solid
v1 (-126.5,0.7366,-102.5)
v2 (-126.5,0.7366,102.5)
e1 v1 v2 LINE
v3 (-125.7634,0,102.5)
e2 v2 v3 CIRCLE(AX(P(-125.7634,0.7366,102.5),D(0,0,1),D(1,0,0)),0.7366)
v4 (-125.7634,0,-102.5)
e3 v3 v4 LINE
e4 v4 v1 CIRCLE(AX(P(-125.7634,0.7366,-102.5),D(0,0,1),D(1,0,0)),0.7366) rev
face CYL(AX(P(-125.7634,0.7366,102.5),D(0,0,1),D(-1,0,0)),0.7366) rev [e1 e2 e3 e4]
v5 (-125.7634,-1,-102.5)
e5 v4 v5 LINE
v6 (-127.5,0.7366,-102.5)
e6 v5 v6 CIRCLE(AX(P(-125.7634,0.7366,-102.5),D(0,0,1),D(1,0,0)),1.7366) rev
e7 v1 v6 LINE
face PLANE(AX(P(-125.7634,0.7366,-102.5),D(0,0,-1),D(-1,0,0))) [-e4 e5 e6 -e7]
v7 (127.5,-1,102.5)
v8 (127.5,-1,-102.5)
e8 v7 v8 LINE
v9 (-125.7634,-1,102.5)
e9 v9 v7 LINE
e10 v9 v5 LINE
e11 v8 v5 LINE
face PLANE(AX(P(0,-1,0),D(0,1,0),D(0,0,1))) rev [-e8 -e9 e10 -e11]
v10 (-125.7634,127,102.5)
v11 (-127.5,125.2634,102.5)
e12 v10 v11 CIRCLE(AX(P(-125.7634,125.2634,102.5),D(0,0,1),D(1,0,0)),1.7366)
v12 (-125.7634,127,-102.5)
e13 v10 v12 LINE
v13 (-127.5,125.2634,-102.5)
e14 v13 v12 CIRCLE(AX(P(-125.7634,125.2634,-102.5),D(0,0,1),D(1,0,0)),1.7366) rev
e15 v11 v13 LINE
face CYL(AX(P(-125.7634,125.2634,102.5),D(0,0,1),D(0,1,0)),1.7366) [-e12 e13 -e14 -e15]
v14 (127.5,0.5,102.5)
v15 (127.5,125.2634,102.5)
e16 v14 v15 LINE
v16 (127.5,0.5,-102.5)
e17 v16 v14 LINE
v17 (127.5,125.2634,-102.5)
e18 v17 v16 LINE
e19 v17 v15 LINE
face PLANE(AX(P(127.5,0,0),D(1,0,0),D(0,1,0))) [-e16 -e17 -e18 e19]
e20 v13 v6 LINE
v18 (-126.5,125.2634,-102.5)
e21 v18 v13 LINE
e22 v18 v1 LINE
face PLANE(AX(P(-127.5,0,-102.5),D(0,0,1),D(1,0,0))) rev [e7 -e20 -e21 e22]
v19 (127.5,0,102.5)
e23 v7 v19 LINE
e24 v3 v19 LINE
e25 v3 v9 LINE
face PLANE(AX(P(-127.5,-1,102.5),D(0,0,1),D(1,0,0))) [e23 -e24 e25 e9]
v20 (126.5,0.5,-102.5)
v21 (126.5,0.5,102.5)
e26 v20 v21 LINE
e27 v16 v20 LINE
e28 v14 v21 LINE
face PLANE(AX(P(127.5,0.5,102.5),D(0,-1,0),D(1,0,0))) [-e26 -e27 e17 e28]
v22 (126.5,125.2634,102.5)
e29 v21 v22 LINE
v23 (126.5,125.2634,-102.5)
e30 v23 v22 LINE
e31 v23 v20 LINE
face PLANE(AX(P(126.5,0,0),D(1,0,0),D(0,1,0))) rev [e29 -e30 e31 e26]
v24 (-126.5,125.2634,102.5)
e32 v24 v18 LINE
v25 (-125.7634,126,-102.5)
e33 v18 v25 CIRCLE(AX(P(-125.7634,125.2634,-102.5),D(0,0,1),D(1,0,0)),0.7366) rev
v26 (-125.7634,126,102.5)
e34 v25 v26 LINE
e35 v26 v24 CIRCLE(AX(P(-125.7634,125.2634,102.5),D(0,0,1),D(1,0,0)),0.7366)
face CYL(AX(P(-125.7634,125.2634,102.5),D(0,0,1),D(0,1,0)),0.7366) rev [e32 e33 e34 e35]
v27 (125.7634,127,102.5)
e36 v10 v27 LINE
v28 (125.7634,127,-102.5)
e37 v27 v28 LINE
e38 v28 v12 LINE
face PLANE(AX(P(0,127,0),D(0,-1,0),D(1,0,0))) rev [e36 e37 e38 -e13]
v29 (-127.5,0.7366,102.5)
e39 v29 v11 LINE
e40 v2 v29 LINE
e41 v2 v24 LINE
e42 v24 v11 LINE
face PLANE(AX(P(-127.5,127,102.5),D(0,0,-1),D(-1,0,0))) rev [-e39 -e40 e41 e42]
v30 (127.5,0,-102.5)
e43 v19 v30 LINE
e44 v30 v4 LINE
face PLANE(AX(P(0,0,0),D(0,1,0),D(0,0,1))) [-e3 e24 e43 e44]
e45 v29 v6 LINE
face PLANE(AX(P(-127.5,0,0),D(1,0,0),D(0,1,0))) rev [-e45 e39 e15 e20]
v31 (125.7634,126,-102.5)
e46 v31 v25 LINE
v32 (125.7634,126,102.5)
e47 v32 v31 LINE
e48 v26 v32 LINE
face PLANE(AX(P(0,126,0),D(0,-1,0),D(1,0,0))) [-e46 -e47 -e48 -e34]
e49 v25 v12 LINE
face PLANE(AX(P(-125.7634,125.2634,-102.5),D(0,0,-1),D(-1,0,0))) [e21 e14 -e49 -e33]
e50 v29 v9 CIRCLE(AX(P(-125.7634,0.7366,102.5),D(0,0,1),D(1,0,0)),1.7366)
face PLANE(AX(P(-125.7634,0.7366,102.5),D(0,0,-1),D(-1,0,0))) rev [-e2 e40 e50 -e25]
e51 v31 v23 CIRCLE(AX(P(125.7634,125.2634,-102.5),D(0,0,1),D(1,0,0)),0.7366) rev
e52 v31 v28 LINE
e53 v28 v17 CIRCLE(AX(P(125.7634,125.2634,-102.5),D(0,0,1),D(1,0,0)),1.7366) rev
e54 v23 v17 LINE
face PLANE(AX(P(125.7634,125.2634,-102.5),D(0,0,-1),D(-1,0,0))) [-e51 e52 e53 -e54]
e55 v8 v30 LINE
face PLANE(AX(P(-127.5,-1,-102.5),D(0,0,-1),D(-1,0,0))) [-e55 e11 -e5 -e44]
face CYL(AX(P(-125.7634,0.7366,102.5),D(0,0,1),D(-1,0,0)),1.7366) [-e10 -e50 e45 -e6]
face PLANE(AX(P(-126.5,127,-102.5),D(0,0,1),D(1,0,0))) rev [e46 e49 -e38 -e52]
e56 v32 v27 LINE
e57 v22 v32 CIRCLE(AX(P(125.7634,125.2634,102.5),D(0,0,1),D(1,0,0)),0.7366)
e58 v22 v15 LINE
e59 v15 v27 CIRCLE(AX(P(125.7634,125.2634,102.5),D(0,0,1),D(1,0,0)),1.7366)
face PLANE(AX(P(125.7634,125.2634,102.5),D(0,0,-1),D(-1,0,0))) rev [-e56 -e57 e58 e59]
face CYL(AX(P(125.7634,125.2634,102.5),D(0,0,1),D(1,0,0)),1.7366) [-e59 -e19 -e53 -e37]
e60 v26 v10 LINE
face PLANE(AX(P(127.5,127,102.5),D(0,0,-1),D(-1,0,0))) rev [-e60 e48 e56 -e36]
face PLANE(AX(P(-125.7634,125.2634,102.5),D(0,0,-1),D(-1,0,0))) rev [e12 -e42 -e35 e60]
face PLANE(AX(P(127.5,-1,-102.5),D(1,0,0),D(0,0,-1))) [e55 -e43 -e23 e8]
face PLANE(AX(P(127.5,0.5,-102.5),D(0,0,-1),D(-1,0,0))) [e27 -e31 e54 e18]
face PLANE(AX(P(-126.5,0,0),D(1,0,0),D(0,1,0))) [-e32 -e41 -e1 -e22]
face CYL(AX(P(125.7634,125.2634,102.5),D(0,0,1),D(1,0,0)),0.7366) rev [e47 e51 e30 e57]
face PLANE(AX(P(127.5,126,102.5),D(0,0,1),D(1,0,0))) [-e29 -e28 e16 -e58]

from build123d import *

# Parameters (mm, degrees)
SKETCH1_W                    = 255
SKETCH1_H                    = 205
BASE_FLANGE1_DEPTH           = 1
EDGE_FLANGE1_STRIP_W         = 5.4732
EDGE_FLANGE1_STRIP_H         = 1
EDGE_FLANGE1_STRIP_CUT_DEPTH = 205
EDGE_FLANGE1_DEPTH           = 205
EDGE_FLANGE2_STRIP_W         = 5.4732
EDGE_FLANGE2_STRIP_H         = 1
EDGE_FLANGE2_STRIP_CUT_DEPTH = 205
EDGE_FLANGE2_DEPTH           = 205
EDGE_FLANGE3_STRIP_W         = 5.4732
EDGE_FLANGE3_STRIP_H         = 1
EDGE_FLANGE3_STRIP_CUT_DEPTH = 205
EDGE_FLANGE3_DEPTH           = 205


# Sheet-metal steps are written as plain solids
with BuildPart() as part:
    # Sketch1 → Base-Flange1 (new body)
    with BuildSketch(Plane(origin=(0, 0, 0), x_dir=(1, 0, 0), z_dir=(0, 1, 0))):
        Rectangle(SKETCH1_W, SKETCH1_H)
    extrude(amount=-BASE_FLANGE1_DEPTH)

    # Edge-Flange1 strip (across the edge) → Edge-Flange1 strip cut (cut)
    with BuildSketch(Plane(origin=(-127.5, 0, -102.5), x_dir=(1, 0, 0), z_dir=(0, 0, 1))):
        with Locations((-1, -0.5)):
            Rectangle(EDGE_FLANGE1_STRIP_W, EDGE_FLANGE1_STRIP_H)
    extrude(amount=EDGE_FLANGE1_STRIP_CUT_DEPTH, mode=Mode.SUBTRACT)

    # Edge-Flange1 section (across the edge) → Edge-Flange1 (add)
    with BuildSketch(Plane(origin=(-127.5, 0, -102.5), x_dir=(1, 0, 0), z_dir=(0, 0, 1))):
        with BuildLine():
            Line((0, 0.7366), (0, 127))
            Line((0, 127), (1, 127))
            Line((1, 127), (1, 0.7366))
            ThreePointArc((1, 0.7366), (1.215745145, 0.215745145), (1.7366, 0))
            Line((1.7366, 0), (1.7366, -1))
            ThreePointArc((1.7366, -1), (0.508638364, -0.491361636), (0, 0.7366))
        make_face()
    extrude(amount=EDGE_FLANGE1_DEPTH)

    # Edge-Flange2 strip (across the edge) → Edge-Flange2 strip cut (cut)
    with BuildSketch(Plane(origin=(-126.5, 127, -102.5), x_dir=(0, -1, 0), z_dir=(0, 0, 1))):
        with Locations((-1, -0.5)):
            Rectangle(EDGE_FLANGE2_STRIP_W, EDGE_FLANGE2_STRIP_H)
    extrude(amount=EDGE_FLANGE2_STRIP_CUT_DEPTH, mode=Mode.SUBTRACT)

    # Edge-Flange2 section (across the edge) → Edge-Flange2 (add)
    with BuildSketch(Plane(origin=(-126.5, 127, -102.5), x_dir=(0, -1, 0), z_dir=(0, 0, 1))):
        with BuildLine():
            Line((0, 0.7366), (0, 254))
            Line((0, 254), (1, 254))
            Line((1, 254), (1, 0.7366))
            ThreePointArc((1, 0.7366), (1.215745145, 0.215745145), (1.7366, 0))
            Line((1.7366, 0), (1.7366, -1))
            ThreePointArc((1.7366, -1), (0.508638364, -0.491361636), (0, 0.7366))
        make_face()
    extrude(amount=EDGE_FLANGE2_DEPTH)

    # Edge-Flange3 strip (across the edge) → Edge-Flange3 strip cut (cut)
    with BuildSketch(Plane(origin=(127.5, 126, -102.5), x_dir=(-1, 0, 0), z_dir=(0, 0, 1))):
        with Locations((-1, -0.5)):
            Rectangle(EDGE_FLANGE3_STRIP_W, EDGE_FLANGE3_STRIP_H)
    extrude(amount=EDGE_FLANGE3_STRIP_CUT_DEPTH, mode=Mode.SUBTRACT)

    # Edge-Flange3 section (across the edge) → Edge-Flange3 (add)
    with BuildSketch(Plane(origin=(127.5, 126, -102.5), x_dir=(-1, 0, 0), z_dir=(0, 0, 1))):
        with BuildLine():
            Line((0, 0.7366), (0, 125.5))
            Line((0, 125.5), (1, 125.5))
            Line((1, 125.5), (1, 0.7366))
            ThreePointArc((1, 0.7366), (1.215745145, 0.215745145), (1.7366, 0))
            Line((1.7366, 0), (1.7366, -1))
            ThreePointArc((1.7366, -1), (0.508638364, -0.491361636), (0, 0.7366))
        make_face()
    extrude(amount=EDGE_FLANGE3_DEPTH)


solid = part.part
